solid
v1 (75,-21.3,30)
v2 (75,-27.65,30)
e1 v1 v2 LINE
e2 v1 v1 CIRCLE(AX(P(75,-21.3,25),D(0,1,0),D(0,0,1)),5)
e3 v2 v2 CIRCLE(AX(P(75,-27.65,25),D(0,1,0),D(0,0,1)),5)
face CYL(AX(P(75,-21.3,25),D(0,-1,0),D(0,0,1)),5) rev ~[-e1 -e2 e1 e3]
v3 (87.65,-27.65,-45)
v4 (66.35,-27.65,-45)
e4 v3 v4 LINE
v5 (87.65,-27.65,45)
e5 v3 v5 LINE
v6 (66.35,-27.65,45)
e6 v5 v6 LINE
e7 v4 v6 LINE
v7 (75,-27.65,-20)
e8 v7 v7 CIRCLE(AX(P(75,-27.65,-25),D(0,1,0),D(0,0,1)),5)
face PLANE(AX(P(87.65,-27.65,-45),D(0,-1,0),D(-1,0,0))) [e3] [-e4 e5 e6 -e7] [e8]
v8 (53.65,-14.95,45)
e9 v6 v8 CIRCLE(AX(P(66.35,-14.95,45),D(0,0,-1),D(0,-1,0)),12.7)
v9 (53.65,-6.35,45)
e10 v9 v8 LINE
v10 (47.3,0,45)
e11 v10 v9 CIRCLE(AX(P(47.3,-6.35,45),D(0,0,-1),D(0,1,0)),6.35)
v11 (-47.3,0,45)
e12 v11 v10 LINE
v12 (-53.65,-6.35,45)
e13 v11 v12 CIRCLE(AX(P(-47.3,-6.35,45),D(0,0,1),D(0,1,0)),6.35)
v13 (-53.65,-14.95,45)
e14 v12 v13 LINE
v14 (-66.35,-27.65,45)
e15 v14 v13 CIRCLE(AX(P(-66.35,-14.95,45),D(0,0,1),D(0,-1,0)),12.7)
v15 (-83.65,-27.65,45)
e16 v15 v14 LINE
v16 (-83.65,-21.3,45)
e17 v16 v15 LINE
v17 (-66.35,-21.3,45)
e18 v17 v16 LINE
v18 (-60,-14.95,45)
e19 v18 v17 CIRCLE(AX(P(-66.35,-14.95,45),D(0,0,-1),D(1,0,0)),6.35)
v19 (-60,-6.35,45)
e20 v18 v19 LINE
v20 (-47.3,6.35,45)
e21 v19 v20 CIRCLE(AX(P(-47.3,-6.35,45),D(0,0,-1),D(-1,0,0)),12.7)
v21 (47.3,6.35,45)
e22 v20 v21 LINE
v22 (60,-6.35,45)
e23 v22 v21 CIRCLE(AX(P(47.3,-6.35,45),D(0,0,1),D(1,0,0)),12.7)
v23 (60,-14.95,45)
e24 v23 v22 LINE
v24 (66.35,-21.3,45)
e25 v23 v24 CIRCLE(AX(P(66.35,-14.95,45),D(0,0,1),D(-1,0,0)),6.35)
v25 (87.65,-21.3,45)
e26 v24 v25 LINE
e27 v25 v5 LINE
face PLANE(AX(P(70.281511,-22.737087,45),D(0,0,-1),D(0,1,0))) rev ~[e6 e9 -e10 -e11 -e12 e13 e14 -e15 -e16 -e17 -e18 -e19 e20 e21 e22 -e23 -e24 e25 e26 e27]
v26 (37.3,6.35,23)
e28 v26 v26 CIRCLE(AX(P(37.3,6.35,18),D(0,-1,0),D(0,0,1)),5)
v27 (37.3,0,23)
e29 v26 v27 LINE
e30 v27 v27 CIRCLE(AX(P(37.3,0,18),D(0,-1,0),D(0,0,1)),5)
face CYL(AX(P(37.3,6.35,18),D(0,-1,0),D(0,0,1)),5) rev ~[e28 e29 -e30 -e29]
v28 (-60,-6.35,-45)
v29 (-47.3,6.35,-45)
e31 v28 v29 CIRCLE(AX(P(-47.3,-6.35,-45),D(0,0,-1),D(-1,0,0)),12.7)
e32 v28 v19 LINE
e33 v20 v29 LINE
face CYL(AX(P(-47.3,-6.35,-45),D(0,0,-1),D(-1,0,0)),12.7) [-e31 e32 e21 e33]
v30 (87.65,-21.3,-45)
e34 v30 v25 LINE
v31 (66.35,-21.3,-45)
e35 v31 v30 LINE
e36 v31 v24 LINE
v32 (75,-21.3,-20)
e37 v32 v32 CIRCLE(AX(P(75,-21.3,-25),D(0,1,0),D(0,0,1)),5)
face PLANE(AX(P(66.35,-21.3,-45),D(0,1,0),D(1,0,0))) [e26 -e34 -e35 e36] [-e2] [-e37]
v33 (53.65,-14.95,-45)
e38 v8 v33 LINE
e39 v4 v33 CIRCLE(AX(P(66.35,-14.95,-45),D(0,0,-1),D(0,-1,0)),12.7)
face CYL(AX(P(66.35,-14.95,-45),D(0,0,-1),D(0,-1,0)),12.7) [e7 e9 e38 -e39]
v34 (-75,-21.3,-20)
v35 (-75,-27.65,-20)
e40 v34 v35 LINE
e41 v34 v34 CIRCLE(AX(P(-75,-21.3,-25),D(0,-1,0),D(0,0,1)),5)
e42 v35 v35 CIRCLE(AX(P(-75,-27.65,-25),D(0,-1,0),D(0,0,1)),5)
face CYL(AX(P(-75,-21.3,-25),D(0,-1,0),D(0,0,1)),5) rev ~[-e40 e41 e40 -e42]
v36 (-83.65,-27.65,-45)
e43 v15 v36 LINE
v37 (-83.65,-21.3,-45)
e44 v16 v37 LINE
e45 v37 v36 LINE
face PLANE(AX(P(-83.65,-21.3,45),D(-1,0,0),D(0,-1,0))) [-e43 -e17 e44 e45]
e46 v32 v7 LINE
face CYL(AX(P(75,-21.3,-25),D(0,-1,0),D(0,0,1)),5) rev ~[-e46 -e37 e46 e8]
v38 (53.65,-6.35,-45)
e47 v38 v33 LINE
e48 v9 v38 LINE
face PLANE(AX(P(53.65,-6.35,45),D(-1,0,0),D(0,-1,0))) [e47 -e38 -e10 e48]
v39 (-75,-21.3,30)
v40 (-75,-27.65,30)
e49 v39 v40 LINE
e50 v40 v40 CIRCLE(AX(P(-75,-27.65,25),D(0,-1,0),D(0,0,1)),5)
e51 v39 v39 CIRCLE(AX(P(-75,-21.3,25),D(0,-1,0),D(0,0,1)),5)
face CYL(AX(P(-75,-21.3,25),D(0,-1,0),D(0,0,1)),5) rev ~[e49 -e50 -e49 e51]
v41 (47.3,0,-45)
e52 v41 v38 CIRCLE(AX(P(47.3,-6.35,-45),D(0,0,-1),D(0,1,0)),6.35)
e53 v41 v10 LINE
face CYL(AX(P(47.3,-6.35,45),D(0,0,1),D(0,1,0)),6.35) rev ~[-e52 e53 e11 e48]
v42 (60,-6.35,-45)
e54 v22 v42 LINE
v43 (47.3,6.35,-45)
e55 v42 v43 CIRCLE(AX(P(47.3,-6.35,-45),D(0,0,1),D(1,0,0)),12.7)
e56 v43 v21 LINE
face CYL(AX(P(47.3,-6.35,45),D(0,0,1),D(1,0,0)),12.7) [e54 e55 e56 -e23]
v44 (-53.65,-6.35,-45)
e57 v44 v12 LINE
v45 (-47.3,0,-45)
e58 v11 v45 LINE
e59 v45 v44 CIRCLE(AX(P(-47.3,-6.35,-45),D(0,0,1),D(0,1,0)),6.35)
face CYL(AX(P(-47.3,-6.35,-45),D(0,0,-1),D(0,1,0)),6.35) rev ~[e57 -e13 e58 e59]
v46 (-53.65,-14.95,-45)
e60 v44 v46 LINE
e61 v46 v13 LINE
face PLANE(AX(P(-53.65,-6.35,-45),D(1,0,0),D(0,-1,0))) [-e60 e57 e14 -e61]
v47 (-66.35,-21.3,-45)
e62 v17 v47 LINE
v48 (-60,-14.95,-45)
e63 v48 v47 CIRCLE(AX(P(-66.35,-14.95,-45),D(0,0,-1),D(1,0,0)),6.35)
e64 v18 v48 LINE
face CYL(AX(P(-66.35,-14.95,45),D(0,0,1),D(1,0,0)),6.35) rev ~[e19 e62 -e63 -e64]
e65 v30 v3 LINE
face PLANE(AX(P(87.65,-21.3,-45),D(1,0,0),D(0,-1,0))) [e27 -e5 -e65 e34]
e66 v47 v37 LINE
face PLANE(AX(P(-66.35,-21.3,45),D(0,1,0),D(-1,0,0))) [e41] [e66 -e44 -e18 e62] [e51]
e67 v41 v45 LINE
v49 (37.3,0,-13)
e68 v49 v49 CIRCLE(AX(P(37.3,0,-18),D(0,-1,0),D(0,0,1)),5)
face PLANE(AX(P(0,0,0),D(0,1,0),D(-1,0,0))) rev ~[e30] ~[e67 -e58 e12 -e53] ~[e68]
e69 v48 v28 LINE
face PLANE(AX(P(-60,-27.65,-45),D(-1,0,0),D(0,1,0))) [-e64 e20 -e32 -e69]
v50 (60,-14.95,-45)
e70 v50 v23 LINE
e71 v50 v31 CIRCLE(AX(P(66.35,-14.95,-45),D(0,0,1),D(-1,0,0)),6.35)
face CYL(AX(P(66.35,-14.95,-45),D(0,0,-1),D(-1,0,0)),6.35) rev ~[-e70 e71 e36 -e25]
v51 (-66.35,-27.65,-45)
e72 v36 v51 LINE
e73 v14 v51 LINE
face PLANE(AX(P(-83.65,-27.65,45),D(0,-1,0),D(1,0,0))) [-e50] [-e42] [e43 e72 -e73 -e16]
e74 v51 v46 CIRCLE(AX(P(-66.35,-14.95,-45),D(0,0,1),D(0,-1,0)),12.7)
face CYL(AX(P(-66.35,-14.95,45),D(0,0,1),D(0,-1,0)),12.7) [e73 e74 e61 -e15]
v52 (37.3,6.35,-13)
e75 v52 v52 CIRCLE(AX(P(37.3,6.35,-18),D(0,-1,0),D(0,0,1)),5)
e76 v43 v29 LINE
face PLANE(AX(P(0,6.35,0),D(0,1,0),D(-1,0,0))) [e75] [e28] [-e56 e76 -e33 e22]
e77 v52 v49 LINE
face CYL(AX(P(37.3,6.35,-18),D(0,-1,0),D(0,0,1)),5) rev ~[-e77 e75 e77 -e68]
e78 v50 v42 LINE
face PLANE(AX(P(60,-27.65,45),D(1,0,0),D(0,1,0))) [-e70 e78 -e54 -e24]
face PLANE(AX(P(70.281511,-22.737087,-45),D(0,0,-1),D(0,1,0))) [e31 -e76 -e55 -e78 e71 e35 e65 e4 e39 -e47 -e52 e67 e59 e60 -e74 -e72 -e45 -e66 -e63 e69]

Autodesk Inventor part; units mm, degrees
ref_plane "YZ Plane" through (0, 0, 0) normal (1, 0, 0) x (0, 1, 0)
ref_plane "XZ Plane" through (0, 0, 0) normal (0, 1, 0) x (-1, 0, 0)
ref_plane "XY Plane" through (0, 0, 0) normal (0, 0, 1) x (1, 0, 0)
sketch "Sketch1" plane through (0, 0, 0) normal (0, 1, 0) x (-1, 0, 0)
  line L0 (60, 45) -> (-60, 45)
  line L1 (-60, 45) -> (-60, -45)
  line L2 (-60, -45) -> (60, -45)
  line L3 (60, -45) -> (60, 45)
  point P0 (0, 0)
  point P1 (0, 0)
  dimension "d0" = 120
  dimension "d1" = 60
  dimension "d2" = 90
  dimension "d3" = 45
extrude "Plate1" add sketch "Sketch1" along normal blind 6.35
sketch "Sketch2" plane through (-53.65, 6.35, 45) normal (-1, 0, 0) x (0, 1, 0)
  line L0 (0, -90) -> (0, 0)
  line L1 (0, 0) -> (-34, 0)
  line L2 (-34, 0) -> (-34, -90)
  line L3 (-34, -90) -> (0, -90)
edge flange "Flange1" height 34 angle 90 thickness 6.35 bend radius 6.35 thickness toward (-1, 0, 0) relief tear relief width 6.35 relief depth 3.175 edges at (-60, 6.35, 0) wall of the first edge with corners at (-53.65, 6.35, -45) (-53.65, 6.35, 45) (-53.65, -27.65, 45) (-53.65, -27.65, -45)
bend "Bend1"
corner "Corner1"
sketch "Sketch4" plane through (-53.65, -21.3, -45) normal (0, -1, 0) x (-1, 0, 0)
  line L0 (0, 90) -> (0, 0)
  line L1 (0, 0) -> (30, 0)
  line L2 (30, 0) -> (30, 90)
  line L3 (30, 90) -> (0, 90)
edge flange "Flange3" height 30 angle 90 thickness 6.35 bend radius 6.35 thickness toward (0, -1, 0) relief tear relief width 6.35 relief depth 3.175 edges at (-53.65, -27.65, 0) wall of the first edge with corners at (-53.65, -21.3, 45) (-53.65, -21.3, -45) (-83.65, -21.3, -45) (-83.65, -21.3, 45)
bend "Bend3"
corner "Corner3"
sketch "Sketch5" plane through (53.65, 6.35, 45) normal (1, 0, 0) x (0, 1, 0)
  line L0 (0, -90) -> (0, 0)
  line L1 (0, 0) -> (-34, 0)
  line L2 (-34, 0) -> (-34, -90)
  line L3 (-34, -90) -> (0, -90)
edge flange "Flange4" height 34 angle 90 thickness 6.35 bend radius 6.35 thickness toward (1, 0, 0) relief tear relief width 6.35 relief depth 3.175 edges at (60, 0, 0) wall of the first edge with corners at (53.65, 6.35, -45) (53.65, 6.35, 45) (53.65, -27.65, 45) (53.65, -27.65, -45)
bend "Bend4"
corner "Corner4"
sketch "Sketch6" plane through (53.65, -21.3, 45) normal (0, -1, 0) x (-1, 0, 0)
  line L0 (0, -90) -> (0, 0)
  line L1 (0, 0) -> (-34, 0)
  line L2 (-34, 0) -> (-34, -90)
  line L3 (-34, -90) -> (0, -90)
edge flange "Flange5" height 34 angle 90 thickness 6.35 bend radius 6.35 thickness toward (0, -1, 0) relief tear relief width 6.35 relief depth 3.175 edges at (53.65, -27.65, 0) wall of the first edge with corners at (53.65, -21.3, -45) (53.65, -21.3, 45) (87.65, -21.3, 45) (87.65, -21.3, -45)
bend "Bend5"
corner "Corner5"
sketch "Sketch7" plane through (0, 6.35, 0) normal (0, 1, 0) x (1, 0, 0)
  line L0 (37.3, 18) -> (37.3, -18)
  line L1 (47.3, -45) -> (47.3, 45) projected
  point P0 (0, 0)
  dimension "d55" = 36
  dimension "d56" = 18
  dimension "d57" = 10
hole "Hole1" at (37.3, 6.35, -18) at (37.3, 6.35, 18) direction (0, -1, 0) diameter 10 depth 6.35
sketch "Sketch8" plane through (-83.65, -21.3, 45) normal (0, 1, 0) x (1, 0, 0)
  line L0 (17.3, 0) -> (0, 0) projected
  line L1 (8.65, 0) -> (8.65, 90)
  line L2 (0, 90) -> (17.3, 90) projected
  line L3 (0, 0) -> (0, 90) projected
  line L4 (0, 20) -> (17.3, 20)
  line L5 (17.3, 0) -> (17.3, 90) projected
  line L6 (0, 70) -> (17.3, 70)
  point P0 (83.65, 45)
  point P1 (8.65, 20)
  point P2 (8.65, 70)
  dimension "d65" = 20
  dimension "d66" = 20
hole "Hole2" at (-75, -21.3, 25) at (-75, -21.3, -25) direction (0, -1, 0) diameter 10 depth 6.35
mirror "Mirror1" about plane through (0, 0, 0) normal (1, 0, 0) of "Hole2"
equation "\"d56\" = 0.5 * d55"
equation "\"d63\" = Thickness"
equation "\"d72\" = Thickness"
equation "\"d4\" = Thickness"
equation "\"d5\" = BendReliefWidth"
equation "\"d6\" = BendReliefDepth"
equation "\"d7\" = MinimumRemnant"
equation "\"d8\" = TransitionRadius"
equation "\"d11\" = BendRadius"
equation "\"d12\" = CornerReliefSize"
equation "\"d13\" = GapSize"
equation "\"d14\" = JacobiRadiusSize"
equation "\"d25\" = BendReliefWidth"
equation "\"d26\" = BendReliefDepth"
equation "\"d27\" = MinimumRemnant"
equation "\"d28\" = TransitionRadius"
equation "\"d31\" = BendRadius"
equation "\"d32\" = CornerReliefSize"
equation "\"d33\" = GapSize"
equation "\"d34\" = JacobiRadiusSize"
equation "\"d35\" = BendReliefWidth"
equation "\"d36\" = BendReliefDepth"
equation "\"d37\" = MinimumRemnant"
equation "\"d38\" = TransitionRadius"
equation "\"d41\" = BendRadius"
equation "\"d42\" = CornerReliefSize"
equation "\"d43\" = GapSize"
equation "\"d44\" = JacobiRadiusSize"
equation "\"d45\" = BendReliefWidth"
equation "\"d46\" = BendReliefDepth"
equation "\"d47\" = MinimumRemnant"
equation "\"d48\" = TransitionRadius"
equation "\"d51\" = BendRadius"
equation "\"d52\" = CornerReliefSize"
equation "\"d53\" = GapSize"
equation "\"d54\" = JacobiRadiusSize"
equation "\"d1\" = 0.5 * d0"
equation "\"d3\" = 0.5 * d2"
equation "\"BendRadius\" = Thickness"
equation "\"BendReliefWidth\" = Thickness"
equation "\"BendReliefDepth\" = 0.5 * Thickness"
equation "\"CornerReliefSize\" = 4 * Thickness"
equation "\"MinimumRemnant\" = 2 * Thickness"
equation "\"TransitionRadius\" = BendRadius"
equation "\"JacobiRadiusSize\" = BendRadius"
equation "\"GapSize\" = Thickness"
equation "\"Thickness\" = 6.35"
properties part number "PlacaActuadorAvance"
